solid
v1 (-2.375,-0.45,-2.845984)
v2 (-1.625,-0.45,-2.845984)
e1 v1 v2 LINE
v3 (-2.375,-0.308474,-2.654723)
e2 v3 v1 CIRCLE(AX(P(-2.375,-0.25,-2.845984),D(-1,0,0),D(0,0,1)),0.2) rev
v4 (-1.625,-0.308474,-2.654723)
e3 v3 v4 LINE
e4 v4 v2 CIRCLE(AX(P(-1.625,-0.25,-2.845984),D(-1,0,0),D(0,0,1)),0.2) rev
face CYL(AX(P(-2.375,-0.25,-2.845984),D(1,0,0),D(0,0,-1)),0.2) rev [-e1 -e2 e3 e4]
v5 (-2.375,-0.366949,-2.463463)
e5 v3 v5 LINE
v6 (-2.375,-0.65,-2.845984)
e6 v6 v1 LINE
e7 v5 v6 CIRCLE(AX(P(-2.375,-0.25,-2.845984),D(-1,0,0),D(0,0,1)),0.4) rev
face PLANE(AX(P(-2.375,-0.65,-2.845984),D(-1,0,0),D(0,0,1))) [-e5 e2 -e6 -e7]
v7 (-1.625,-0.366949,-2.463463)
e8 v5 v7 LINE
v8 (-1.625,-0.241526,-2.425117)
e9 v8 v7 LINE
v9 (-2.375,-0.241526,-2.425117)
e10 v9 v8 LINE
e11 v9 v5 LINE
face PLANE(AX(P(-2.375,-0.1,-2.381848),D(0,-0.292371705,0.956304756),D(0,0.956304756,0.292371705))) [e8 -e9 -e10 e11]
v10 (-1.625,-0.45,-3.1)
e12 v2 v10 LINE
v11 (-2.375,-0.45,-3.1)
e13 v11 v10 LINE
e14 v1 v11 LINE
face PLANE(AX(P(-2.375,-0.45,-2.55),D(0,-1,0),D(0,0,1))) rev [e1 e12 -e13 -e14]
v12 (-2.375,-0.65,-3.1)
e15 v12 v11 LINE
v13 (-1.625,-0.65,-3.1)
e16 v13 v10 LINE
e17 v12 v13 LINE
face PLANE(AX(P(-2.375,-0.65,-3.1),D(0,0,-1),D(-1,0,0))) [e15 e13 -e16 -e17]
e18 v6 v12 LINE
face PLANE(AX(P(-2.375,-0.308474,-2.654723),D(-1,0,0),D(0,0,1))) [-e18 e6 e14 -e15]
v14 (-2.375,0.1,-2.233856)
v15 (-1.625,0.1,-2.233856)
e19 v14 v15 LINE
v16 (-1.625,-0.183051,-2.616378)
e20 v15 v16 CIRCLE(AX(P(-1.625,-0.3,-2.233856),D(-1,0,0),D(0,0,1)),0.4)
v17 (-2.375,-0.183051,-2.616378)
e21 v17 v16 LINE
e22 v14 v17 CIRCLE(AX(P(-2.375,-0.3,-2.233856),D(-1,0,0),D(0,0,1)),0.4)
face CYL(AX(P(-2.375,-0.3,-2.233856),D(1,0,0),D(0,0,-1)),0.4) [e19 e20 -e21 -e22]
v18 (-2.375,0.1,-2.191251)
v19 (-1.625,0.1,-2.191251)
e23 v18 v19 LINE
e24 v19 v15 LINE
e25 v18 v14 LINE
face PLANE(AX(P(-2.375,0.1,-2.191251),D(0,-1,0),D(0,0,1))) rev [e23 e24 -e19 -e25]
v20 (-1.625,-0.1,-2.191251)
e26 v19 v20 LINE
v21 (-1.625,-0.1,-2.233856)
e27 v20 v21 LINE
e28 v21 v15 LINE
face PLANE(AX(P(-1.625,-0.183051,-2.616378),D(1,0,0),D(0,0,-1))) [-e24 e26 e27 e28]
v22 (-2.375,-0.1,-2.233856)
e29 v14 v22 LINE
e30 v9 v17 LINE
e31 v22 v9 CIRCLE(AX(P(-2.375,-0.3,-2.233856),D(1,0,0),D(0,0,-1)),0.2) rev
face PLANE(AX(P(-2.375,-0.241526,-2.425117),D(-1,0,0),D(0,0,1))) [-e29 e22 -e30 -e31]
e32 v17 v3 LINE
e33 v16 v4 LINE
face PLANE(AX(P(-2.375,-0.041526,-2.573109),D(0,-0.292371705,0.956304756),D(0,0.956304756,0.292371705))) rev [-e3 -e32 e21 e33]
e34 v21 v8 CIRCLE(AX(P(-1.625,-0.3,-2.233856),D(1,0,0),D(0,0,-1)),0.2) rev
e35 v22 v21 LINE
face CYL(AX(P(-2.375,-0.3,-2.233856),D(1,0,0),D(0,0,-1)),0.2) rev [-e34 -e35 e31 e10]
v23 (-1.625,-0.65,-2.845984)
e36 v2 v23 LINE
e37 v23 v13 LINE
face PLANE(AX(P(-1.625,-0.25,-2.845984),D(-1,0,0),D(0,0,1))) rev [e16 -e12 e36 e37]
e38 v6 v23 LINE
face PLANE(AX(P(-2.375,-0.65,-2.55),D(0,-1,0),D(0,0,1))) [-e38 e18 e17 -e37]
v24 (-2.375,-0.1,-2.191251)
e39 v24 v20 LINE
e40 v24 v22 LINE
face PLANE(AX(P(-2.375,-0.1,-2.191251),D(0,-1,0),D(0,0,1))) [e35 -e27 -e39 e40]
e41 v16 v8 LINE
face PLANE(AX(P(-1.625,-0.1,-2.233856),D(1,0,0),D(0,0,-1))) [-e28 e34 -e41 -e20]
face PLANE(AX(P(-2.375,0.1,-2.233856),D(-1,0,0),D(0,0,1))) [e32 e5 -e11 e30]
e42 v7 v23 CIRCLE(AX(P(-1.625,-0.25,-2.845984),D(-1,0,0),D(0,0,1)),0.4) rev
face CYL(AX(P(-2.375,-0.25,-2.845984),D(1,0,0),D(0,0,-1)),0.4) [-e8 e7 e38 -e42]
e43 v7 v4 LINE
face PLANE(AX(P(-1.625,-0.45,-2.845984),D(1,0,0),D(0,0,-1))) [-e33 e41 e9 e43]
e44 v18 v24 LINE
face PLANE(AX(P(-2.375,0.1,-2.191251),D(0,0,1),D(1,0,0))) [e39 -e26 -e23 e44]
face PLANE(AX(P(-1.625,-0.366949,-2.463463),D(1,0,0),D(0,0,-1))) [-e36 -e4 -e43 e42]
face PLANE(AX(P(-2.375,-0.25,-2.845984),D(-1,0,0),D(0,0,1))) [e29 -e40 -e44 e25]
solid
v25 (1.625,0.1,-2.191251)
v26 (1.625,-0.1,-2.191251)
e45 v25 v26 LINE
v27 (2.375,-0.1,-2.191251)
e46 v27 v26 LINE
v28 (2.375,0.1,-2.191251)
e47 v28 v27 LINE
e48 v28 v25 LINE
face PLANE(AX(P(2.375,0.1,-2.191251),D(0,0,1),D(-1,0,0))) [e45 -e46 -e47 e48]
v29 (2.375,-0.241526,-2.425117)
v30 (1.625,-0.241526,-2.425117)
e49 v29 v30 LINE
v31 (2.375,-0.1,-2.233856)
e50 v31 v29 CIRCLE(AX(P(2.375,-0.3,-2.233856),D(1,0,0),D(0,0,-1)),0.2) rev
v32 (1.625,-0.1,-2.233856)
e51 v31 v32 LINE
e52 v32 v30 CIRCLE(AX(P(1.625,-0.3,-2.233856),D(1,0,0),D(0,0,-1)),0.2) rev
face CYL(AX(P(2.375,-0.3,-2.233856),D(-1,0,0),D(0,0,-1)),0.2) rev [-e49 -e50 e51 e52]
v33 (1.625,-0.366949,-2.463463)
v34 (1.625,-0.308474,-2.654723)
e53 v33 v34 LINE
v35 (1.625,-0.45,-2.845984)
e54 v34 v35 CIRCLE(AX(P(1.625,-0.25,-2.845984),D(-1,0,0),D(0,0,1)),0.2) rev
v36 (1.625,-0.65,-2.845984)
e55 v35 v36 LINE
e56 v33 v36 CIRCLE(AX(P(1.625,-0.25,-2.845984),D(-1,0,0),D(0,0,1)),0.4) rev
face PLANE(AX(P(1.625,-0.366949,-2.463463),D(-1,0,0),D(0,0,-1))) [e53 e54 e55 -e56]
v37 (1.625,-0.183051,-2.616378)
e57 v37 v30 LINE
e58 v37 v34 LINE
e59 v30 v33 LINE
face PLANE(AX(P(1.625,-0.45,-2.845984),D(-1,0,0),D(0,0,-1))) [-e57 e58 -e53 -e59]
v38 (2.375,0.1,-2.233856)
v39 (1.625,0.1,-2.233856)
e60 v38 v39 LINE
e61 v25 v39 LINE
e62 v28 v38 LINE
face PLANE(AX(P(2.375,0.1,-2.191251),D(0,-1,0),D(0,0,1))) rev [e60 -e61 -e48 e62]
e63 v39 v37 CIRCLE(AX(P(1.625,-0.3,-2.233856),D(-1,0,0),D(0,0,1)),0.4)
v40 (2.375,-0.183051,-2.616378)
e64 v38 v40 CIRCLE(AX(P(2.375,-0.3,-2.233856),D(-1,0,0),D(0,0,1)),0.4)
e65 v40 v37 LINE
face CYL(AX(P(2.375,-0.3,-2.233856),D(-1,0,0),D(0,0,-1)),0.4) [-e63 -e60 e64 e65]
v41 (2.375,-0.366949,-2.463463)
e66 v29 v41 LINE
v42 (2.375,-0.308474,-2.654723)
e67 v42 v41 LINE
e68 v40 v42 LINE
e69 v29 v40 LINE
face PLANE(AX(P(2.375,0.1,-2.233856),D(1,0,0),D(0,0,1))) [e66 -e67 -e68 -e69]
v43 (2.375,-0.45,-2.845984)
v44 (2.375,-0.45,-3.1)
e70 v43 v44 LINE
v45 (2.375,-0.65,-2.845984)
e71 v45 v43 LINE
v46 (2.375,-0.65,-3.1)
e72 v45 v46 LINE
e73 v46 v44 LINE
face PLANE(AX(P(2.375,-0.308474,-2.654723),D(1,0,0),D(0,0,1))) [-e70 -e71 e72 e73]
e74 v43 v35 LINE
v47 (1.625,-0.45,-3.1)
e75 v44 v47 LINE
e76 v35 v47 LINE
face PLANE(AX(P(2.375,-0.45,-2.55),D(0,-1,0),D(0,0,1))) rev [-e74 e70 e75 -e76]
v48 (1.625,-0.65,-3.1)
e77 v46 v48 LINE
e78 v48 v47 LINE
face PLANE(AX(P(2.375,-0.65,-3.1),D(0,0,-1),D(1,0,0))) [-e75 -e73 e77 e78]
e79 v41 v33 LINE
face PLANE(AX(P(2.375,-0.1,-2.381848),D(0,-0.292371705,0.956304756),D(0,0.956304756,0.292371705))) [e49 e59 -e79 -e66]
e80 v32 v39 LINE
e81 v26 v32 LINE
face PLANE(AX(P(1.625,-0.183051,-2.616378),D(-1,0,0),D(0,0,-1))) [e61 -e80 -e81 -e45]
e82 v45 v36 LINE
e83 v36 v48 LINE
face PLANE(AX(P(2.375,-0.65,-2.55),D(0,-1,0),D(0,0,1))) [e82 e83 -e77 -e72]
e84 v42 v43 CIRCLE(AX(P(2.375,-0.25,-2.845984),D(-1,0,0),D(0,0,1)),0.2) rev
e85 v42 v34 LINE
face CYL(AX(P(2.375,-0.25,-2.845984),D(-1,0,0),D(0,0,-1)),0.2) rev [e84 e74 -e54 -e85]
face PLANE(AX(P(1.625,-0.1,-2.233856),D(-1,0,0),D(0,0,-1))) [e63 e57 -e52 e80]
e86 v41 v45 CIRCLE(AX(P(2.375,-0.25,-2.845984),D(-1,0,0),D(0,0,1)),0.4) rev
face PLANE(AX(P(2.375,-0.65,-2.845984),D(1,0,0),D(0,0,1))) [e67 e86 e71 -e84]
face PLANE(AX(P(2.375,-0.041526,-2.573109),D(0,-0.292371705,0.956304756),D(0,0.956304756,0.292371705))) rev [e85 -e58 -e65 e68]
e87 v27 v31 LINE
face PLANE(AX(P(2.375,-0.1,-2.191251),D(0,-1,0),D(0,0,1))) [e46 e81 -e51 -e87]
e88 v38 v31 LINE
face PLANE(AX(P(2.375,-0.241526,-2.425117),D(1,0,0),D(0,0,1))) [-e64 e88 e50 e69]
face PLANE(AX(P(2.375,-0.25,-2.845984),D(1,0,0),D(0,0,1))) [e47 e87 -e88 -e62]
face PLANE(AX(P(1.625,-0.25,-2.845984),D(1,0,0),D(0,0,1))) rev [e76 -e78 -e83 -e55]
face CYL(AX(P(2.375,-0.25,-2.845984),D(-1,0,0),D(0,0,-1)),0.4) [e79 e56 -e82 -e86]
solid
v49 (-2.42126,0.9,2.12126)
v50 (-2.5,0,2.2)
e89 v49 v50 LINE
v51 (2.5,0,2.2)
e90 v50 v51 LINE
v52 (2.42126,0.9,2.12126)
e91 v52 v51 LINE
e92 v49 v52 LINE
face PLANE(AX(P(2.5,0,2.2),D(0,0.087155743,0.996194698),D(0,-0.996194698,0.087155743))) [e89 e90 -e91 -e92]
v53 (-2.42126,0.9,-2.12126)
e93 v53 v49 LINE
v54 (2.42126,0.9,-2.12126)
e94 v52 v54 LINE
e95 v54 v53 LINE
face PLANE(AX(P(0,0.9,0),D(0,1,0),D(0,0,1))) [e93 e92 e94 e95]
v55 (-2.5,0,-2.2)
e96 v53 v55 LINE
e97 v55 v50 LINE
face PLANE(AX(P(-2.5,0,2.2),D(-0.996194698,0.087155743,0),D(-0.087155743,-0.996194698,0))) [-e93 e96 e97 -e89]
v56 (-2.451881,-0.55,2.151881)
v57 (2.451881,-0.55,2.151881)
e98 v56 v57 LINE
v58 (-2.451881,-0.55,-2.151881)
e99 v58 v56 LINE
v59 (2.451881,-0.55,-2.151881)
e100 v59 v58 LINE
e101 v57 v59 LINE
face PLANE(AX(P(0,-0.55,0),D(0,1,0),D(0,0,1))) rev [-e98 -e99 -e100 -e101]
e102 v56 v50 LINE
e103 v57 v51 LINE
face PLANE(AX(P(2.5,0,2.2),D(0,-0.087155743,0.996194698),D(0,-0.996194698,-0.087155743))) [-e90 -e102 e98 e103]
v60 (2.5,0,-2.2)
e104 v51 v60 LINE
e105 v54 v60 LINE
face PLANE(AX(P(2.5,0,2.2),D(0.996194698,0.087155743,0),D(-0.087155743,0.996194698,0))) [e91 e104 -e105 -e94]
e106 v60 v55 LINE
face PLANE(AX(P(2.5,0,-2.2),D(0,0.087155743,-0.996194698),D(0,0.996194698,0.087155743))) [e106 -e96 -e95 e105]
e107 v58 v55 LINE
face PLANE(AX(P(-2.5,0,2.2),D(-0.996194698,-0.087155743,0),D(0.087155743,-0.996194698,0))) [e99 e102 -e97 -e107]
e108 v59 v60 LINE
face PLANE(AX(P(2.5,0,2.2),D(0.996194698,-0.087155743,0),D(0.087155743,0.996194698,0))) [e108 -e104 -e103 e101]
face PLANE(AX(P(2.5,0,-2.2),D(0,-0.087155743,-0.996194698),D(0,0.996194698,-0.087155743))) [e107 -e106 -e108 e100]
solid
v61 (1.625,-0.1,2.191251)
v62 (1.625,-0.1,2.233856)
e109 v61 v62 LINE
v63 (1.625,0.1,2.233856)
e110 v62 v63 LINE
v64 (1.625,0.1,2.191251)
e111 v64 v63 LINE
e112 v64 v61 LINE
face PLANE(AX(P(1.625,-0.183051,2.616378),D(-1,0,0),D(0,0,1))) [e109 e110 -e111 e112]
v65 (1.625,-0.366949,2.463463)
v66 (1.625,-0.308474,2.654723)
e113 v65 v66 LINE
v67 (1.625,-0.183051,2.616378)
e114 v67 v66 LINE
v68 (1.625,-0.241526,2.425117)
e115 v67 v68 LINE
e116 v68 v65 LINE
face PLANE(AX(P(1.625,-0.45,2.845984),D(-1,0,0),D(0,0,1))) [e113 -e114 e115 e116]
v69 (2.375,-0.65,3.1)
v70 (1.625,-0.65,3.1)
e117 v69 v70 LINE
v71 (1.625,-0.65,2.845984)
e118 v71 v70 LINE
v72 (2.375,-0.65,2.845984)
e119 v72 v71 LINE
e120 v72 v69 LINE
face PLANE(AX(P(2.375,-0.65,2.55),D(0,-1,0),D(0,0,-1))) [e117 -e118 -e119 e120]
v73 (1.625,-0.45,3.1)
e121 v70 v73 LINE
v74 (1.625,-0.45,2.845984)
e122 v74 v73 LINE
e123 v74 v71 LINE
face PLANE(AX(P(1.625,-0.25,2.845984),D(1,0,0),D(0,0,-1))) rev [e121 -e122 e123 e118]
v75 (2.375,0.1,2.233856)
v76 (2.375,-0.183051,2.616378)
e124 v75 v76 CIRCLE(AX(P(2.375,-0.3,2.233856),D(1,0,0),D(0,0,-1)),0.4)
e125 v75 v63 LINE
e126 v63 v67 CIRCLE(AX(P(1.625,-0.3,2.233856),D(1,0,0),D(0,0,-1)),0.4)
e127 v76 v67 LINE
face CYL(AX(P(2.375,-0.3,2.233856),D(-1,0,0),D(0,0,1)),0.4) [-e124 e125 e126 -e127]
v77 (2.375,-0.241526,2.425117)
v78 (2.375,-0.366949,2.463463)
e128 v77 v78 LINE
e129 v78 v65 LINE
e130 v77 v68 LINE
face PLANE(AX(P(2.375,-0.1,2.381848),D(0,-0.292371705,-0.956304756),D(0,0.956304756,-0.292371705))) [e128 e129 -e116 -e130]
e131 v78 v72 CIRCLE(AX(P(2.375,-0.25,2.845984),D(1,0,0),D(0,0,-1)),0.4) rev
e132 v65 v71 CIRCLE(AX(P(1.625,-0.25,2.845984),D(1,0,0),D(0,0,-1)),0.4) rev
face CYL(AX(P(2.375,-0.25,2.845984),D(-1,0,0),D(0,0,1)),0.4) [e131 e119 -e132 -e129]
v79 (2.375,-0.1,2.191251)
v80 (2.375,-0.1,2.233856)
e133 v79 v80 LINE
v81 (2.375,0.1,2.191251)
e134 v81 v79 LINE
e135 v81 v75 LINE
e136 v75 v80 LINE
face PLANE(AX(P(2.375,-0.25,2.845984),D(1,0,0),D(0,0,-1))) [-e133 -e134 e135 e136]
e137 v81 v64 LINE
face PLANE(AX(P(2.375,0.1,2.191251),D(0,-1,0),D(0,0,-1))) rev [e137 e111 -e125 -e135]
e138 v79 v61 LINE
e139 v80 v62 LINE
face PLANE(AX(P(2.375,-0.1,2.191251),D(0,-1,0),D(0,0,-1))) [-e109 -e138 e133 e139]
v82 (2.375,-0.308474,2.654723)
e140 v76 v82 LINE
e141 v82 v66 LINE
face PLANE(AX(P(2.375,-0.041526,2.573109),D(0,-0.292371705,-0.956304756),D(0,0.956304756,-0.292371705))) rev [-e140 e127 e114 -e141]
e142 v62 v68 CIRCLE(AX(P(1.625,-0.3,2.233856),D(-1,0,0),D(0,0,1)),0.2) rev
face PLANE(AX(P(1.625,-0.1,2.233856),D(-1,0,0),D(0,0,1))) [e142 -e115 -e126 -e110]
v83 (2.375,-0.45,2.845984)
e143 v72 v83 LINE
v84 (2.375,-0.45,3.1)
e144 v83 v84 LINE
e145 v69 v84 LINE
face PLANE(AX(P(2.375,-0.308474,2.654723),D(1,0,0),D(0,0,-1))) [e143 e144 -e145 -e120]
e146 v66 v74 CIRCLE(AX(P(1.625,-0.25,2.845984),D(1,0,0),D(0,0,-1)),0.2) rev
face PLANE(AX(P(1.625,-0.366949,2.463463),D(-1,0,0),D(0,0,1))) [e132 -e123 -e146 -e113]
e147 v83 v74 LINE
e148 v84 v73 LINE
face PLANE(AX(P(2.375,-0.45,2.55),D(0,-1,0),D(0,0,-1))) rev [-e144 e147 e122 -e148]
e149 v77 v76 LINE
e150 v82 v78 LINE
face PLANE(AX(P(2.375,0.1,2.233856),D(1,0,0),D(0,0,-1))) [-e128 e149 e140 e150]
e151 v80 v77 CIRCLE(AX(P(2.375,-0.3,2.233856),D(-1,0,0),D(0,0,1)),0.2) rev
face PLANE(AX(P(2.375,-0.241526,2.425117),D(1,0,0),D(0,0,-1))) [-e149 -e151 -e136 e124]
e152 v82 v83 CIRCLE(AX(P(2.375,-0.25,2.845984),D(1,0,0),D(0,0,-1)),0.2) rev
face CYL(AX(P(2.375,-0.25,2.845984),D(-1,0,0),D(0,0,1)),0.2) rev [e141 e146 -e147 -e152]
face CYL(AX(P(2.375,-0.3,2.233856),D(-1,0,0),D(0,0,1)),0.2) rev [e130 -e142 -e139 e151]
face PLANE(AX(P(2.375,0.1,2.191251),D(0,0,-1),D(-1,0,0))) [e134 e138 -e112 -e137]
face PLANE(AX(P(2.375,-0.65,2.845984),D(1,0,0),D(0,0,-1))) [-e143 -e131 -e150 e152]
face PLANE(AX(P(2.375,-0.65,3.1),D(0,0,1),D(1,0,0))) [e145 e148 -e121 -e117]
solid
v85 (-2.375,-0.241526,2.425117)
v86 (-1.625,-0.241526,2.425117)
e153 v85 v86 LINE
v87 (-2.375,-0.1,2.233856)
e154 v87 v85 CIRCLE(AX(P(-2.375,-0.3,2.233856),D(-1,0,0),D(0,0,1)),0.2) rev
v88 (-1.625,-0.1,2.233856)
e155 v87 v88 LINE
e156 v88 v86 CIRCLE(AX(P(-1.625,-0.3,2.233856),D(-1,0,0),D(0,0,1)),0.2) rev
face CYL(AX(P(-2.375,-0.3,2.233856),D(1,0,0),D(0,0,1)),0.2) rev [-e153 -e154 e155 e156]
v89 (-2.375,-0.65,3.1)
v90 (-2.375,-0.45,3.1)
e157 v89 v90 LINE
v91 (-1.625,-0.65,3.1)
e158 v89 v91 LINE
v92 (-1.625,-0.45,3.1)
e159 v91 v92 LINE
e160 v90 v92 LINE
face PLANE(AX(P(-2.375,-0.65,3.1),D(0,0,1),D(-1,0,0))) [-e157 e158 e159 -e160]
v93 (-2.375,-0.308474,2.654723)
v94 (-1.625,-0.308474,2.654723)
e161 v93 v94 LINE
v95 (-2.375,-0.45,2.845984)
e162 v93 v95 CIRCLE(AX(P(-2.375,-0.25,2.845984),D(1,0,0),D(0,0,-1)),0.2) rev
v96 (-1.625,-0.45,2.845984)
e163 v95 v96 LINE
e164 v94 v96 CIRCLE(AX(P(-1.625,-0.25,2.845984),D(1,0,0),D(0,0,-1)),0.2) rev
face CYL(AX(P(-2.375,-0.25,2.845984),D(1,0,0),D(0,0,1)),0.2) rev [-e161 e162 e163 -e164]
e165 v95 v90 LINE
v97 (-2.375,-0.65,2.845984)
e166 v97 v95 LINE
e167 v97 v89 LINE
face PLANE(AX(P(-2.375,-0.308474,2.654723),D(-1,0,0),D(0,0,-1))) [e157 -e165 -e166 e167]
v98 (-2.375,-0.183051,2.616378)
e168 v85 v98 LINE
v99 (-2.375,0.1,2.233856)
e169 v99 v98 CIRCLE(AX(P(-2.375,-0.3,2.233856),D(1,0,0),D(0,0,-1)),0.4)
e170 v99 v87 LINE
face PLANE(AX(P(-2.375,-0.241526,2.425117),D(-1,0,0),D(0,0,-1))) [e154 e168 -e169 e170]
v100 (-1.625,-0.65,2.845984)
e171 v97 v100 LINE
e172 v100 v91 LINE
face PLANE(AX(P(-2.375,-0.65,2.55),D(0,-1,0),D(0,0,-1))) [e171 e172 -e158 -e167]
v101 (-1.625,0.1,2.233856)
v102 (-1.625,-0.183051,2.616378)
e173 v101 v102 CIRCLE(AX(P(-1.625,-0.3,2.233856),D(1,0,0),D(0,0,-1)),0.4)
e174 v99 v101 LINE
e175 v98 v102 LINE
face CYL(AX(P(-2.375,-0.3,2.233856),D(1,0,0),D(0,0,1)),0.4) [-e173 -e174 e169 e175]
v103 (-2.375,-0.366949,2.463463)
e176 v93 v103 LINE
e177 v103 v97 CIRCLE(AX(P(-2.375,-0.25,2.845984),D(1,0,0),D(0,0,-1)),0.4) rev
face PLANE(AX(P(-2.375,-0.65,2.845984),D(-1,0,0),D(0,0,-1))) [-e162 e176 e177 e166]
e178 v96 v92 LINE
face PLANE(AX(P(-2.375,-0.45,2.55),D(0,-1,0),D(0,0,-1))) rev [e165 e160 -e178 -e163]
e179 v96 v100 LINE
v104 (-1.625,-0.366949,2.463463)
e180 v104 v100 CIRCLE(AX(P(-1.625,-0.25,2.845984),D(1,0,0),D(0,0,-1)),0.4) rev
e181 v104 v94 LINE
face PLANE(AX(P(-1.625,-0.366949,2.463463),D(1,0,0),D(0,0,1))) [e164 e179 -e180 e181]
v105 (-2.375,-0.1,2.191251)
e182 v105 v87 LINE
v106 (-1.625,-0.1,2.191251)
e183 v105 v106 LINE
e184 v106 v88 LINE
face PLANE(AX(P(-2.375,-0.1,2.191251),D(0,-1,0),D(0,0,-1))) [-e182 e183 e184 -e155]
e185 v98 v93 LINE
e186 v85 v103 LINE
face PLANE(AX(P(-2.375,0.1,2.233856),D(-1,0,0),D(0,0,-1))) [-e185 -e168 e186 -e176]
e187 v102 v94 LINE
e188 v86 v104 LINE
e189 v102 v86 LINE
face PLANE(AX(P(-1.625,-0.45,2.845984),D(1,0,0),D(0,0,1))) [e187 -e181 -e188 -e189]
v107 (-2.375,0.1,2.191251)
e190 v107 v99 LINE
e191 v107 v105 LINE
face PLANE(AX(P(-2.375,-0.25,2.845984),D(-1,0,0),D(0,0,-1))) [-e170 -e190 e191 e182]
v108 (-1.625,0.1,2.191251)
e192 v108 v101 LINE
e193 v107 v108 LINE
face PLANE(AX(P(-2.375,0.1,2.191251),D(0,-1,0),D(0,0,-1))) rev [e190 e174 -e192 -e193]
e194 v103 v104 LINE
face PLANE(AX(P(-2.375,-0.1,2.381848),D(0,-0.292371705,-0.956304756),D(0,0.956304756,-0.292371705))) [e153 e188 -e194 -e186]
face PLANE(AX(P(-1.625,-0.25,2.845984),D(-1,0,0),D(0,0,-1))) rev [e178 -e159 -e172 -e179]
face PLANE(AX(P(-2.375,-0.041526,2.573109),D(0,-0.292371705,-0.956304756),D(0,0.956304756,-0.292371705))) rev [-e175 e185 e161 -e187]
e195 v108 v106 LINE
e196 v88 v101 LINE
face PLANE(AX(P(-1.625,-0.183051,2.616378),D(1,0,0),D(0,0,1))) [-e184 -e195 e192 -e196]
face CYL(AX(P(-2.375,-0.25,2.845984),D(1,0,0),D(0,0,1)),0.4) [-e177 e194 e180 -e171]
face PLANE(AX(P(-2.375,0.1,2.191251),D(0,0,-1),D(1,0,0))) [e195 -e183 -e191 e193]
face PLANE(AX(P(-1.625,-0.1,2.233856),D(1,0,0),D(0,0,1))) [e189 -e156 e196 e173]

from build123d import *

# Parameters (mm, degrees)
ESQUISSE1_W                    = 5
ESQUISSE1_H                    = 4.4
BOSS_EXTRU_1_DEPTH             = 0.9
BOSS_EXTRU_1_TAPER             = 5
BOSS_EXTRU_1_OTHER_WAY_DEPTH   = 0.55
BOSS_EXTRU_1_OTHER_WAY_TAPER   = 5
T_LE_DE_BASE_PLI_E1_DEPTH      = 0.375
T_LE_DE_BASE_PLI_E1_DEPTH_BACK = 0.375


# Sheet-metal steps are written as plain solids
with BuildPart() as part:
    # Esquisse1 → Boss.-Extru.1 (new body)
    with BuildSketch(Plane(origin=(0, 0, 0), x_dir=(1, 0, 0), z_dir=(0, 1, 0))):
        Rectangle(ESQUISSE1_W, ESQUISSE1_H)
    extrude(amount=BOSS_EXTRU_1_DEPTH, taper=BOSS_EXTRU_1_TAPER)

    # Esquisse1 → Boss.-Extru.1 other way (add)
    with BuildSketch(Plane(origin=(0, 0, 0), x_dir=(1, 0, 0), z_dir=(0, 1, 0))):
        Rectangle(ESQUISSE1_W, ESQUISSE1_H)
    extrude(amount=-BOSS_EXTRU_1_OTHER_WAY_DEPTH, taper=BOSS_EXTRU_1_OTHER_WAY_TAPER)


with BuildPart() as body_2:
    # Esquisse3 → Tôle de base pliée1 (new, two sides: drawn at the far end of the back side and taken through both)
    with BuildSketch(Plane(origin=(2, 0, 0), x_dir=(0, 0, -1), z_dir=(1, 0, 0)).offset(-T_LE_DE_BASE_PLI_E1_DEPTH_BACK)):
        with BuildLine():
            Line((-2.191251134, -0.1), (-2.23385591, -0.1))
            ThreePointArc((-2.23385591, -0.1), (-2.352820468, -0.139228628), (-2.425116861, -0.241525659))
            Line((-2.425116861, -0.241525659), (-2.463462528, -0.366948682))
            ThreePointArc((-2.463462528, -0.366948682), (-2.608055315, -0.571542744), (-2.84598443, -0.65))
            Line((-2.84598443, -0.65), (-3.1, -0.65))
            Line((-3.1, -0.65), (-3.1, -0.45))
            Line((-3.1, -0.45), (-2.84598443, -0.45))
            ThreePointArc((-2.84598443, -0.45), (-2.727019873, -0.410771372), (-2.654723479, -0.308474341))
            Line((-2.654723479, -0.308474341), (-2.616377813, -0.183051318))
            ThreePointArc((-2.616377813, -0.183051318), (-2.471785025, 0.021542744), (-2.23385591, 0.1))
            Line((-2.23385591, 0.1), (-2.191251134, 0.1))
            Line((-2.191251134, 0.1), (-2.191251134, -0.1))
        make_face()
    extrude(amount=T_LE_DE_BASE_PLI_E1_DEPTH + T_LE_DE_BASE_PLI_E1_DEPTH_BACK)


with BuildPart() as body_3:
    # Symétrie1: mirrored copy
    add(body_2.part.mirror(Plane.XY))


with BuildPart() as body_4:
    # Symétrie2: mirrored copy
    add(body_2.part.mirror(Plane(origin=(0, 0, 0), x_dir=(0, 0, 1), z_dir=(1, 0, 0))))


with BuildPart() as body_5:
    # Sym_trie2 2: mirrored copy
    add(body_3.part.mirror(Plane(origin=(0, 0, 0), x_dir=(0, 0, 1), z_dir=(1, 0, 0))))


solid = Compound([part.part, body_2.part, body_3.part, body_4.part, body_5.part])
